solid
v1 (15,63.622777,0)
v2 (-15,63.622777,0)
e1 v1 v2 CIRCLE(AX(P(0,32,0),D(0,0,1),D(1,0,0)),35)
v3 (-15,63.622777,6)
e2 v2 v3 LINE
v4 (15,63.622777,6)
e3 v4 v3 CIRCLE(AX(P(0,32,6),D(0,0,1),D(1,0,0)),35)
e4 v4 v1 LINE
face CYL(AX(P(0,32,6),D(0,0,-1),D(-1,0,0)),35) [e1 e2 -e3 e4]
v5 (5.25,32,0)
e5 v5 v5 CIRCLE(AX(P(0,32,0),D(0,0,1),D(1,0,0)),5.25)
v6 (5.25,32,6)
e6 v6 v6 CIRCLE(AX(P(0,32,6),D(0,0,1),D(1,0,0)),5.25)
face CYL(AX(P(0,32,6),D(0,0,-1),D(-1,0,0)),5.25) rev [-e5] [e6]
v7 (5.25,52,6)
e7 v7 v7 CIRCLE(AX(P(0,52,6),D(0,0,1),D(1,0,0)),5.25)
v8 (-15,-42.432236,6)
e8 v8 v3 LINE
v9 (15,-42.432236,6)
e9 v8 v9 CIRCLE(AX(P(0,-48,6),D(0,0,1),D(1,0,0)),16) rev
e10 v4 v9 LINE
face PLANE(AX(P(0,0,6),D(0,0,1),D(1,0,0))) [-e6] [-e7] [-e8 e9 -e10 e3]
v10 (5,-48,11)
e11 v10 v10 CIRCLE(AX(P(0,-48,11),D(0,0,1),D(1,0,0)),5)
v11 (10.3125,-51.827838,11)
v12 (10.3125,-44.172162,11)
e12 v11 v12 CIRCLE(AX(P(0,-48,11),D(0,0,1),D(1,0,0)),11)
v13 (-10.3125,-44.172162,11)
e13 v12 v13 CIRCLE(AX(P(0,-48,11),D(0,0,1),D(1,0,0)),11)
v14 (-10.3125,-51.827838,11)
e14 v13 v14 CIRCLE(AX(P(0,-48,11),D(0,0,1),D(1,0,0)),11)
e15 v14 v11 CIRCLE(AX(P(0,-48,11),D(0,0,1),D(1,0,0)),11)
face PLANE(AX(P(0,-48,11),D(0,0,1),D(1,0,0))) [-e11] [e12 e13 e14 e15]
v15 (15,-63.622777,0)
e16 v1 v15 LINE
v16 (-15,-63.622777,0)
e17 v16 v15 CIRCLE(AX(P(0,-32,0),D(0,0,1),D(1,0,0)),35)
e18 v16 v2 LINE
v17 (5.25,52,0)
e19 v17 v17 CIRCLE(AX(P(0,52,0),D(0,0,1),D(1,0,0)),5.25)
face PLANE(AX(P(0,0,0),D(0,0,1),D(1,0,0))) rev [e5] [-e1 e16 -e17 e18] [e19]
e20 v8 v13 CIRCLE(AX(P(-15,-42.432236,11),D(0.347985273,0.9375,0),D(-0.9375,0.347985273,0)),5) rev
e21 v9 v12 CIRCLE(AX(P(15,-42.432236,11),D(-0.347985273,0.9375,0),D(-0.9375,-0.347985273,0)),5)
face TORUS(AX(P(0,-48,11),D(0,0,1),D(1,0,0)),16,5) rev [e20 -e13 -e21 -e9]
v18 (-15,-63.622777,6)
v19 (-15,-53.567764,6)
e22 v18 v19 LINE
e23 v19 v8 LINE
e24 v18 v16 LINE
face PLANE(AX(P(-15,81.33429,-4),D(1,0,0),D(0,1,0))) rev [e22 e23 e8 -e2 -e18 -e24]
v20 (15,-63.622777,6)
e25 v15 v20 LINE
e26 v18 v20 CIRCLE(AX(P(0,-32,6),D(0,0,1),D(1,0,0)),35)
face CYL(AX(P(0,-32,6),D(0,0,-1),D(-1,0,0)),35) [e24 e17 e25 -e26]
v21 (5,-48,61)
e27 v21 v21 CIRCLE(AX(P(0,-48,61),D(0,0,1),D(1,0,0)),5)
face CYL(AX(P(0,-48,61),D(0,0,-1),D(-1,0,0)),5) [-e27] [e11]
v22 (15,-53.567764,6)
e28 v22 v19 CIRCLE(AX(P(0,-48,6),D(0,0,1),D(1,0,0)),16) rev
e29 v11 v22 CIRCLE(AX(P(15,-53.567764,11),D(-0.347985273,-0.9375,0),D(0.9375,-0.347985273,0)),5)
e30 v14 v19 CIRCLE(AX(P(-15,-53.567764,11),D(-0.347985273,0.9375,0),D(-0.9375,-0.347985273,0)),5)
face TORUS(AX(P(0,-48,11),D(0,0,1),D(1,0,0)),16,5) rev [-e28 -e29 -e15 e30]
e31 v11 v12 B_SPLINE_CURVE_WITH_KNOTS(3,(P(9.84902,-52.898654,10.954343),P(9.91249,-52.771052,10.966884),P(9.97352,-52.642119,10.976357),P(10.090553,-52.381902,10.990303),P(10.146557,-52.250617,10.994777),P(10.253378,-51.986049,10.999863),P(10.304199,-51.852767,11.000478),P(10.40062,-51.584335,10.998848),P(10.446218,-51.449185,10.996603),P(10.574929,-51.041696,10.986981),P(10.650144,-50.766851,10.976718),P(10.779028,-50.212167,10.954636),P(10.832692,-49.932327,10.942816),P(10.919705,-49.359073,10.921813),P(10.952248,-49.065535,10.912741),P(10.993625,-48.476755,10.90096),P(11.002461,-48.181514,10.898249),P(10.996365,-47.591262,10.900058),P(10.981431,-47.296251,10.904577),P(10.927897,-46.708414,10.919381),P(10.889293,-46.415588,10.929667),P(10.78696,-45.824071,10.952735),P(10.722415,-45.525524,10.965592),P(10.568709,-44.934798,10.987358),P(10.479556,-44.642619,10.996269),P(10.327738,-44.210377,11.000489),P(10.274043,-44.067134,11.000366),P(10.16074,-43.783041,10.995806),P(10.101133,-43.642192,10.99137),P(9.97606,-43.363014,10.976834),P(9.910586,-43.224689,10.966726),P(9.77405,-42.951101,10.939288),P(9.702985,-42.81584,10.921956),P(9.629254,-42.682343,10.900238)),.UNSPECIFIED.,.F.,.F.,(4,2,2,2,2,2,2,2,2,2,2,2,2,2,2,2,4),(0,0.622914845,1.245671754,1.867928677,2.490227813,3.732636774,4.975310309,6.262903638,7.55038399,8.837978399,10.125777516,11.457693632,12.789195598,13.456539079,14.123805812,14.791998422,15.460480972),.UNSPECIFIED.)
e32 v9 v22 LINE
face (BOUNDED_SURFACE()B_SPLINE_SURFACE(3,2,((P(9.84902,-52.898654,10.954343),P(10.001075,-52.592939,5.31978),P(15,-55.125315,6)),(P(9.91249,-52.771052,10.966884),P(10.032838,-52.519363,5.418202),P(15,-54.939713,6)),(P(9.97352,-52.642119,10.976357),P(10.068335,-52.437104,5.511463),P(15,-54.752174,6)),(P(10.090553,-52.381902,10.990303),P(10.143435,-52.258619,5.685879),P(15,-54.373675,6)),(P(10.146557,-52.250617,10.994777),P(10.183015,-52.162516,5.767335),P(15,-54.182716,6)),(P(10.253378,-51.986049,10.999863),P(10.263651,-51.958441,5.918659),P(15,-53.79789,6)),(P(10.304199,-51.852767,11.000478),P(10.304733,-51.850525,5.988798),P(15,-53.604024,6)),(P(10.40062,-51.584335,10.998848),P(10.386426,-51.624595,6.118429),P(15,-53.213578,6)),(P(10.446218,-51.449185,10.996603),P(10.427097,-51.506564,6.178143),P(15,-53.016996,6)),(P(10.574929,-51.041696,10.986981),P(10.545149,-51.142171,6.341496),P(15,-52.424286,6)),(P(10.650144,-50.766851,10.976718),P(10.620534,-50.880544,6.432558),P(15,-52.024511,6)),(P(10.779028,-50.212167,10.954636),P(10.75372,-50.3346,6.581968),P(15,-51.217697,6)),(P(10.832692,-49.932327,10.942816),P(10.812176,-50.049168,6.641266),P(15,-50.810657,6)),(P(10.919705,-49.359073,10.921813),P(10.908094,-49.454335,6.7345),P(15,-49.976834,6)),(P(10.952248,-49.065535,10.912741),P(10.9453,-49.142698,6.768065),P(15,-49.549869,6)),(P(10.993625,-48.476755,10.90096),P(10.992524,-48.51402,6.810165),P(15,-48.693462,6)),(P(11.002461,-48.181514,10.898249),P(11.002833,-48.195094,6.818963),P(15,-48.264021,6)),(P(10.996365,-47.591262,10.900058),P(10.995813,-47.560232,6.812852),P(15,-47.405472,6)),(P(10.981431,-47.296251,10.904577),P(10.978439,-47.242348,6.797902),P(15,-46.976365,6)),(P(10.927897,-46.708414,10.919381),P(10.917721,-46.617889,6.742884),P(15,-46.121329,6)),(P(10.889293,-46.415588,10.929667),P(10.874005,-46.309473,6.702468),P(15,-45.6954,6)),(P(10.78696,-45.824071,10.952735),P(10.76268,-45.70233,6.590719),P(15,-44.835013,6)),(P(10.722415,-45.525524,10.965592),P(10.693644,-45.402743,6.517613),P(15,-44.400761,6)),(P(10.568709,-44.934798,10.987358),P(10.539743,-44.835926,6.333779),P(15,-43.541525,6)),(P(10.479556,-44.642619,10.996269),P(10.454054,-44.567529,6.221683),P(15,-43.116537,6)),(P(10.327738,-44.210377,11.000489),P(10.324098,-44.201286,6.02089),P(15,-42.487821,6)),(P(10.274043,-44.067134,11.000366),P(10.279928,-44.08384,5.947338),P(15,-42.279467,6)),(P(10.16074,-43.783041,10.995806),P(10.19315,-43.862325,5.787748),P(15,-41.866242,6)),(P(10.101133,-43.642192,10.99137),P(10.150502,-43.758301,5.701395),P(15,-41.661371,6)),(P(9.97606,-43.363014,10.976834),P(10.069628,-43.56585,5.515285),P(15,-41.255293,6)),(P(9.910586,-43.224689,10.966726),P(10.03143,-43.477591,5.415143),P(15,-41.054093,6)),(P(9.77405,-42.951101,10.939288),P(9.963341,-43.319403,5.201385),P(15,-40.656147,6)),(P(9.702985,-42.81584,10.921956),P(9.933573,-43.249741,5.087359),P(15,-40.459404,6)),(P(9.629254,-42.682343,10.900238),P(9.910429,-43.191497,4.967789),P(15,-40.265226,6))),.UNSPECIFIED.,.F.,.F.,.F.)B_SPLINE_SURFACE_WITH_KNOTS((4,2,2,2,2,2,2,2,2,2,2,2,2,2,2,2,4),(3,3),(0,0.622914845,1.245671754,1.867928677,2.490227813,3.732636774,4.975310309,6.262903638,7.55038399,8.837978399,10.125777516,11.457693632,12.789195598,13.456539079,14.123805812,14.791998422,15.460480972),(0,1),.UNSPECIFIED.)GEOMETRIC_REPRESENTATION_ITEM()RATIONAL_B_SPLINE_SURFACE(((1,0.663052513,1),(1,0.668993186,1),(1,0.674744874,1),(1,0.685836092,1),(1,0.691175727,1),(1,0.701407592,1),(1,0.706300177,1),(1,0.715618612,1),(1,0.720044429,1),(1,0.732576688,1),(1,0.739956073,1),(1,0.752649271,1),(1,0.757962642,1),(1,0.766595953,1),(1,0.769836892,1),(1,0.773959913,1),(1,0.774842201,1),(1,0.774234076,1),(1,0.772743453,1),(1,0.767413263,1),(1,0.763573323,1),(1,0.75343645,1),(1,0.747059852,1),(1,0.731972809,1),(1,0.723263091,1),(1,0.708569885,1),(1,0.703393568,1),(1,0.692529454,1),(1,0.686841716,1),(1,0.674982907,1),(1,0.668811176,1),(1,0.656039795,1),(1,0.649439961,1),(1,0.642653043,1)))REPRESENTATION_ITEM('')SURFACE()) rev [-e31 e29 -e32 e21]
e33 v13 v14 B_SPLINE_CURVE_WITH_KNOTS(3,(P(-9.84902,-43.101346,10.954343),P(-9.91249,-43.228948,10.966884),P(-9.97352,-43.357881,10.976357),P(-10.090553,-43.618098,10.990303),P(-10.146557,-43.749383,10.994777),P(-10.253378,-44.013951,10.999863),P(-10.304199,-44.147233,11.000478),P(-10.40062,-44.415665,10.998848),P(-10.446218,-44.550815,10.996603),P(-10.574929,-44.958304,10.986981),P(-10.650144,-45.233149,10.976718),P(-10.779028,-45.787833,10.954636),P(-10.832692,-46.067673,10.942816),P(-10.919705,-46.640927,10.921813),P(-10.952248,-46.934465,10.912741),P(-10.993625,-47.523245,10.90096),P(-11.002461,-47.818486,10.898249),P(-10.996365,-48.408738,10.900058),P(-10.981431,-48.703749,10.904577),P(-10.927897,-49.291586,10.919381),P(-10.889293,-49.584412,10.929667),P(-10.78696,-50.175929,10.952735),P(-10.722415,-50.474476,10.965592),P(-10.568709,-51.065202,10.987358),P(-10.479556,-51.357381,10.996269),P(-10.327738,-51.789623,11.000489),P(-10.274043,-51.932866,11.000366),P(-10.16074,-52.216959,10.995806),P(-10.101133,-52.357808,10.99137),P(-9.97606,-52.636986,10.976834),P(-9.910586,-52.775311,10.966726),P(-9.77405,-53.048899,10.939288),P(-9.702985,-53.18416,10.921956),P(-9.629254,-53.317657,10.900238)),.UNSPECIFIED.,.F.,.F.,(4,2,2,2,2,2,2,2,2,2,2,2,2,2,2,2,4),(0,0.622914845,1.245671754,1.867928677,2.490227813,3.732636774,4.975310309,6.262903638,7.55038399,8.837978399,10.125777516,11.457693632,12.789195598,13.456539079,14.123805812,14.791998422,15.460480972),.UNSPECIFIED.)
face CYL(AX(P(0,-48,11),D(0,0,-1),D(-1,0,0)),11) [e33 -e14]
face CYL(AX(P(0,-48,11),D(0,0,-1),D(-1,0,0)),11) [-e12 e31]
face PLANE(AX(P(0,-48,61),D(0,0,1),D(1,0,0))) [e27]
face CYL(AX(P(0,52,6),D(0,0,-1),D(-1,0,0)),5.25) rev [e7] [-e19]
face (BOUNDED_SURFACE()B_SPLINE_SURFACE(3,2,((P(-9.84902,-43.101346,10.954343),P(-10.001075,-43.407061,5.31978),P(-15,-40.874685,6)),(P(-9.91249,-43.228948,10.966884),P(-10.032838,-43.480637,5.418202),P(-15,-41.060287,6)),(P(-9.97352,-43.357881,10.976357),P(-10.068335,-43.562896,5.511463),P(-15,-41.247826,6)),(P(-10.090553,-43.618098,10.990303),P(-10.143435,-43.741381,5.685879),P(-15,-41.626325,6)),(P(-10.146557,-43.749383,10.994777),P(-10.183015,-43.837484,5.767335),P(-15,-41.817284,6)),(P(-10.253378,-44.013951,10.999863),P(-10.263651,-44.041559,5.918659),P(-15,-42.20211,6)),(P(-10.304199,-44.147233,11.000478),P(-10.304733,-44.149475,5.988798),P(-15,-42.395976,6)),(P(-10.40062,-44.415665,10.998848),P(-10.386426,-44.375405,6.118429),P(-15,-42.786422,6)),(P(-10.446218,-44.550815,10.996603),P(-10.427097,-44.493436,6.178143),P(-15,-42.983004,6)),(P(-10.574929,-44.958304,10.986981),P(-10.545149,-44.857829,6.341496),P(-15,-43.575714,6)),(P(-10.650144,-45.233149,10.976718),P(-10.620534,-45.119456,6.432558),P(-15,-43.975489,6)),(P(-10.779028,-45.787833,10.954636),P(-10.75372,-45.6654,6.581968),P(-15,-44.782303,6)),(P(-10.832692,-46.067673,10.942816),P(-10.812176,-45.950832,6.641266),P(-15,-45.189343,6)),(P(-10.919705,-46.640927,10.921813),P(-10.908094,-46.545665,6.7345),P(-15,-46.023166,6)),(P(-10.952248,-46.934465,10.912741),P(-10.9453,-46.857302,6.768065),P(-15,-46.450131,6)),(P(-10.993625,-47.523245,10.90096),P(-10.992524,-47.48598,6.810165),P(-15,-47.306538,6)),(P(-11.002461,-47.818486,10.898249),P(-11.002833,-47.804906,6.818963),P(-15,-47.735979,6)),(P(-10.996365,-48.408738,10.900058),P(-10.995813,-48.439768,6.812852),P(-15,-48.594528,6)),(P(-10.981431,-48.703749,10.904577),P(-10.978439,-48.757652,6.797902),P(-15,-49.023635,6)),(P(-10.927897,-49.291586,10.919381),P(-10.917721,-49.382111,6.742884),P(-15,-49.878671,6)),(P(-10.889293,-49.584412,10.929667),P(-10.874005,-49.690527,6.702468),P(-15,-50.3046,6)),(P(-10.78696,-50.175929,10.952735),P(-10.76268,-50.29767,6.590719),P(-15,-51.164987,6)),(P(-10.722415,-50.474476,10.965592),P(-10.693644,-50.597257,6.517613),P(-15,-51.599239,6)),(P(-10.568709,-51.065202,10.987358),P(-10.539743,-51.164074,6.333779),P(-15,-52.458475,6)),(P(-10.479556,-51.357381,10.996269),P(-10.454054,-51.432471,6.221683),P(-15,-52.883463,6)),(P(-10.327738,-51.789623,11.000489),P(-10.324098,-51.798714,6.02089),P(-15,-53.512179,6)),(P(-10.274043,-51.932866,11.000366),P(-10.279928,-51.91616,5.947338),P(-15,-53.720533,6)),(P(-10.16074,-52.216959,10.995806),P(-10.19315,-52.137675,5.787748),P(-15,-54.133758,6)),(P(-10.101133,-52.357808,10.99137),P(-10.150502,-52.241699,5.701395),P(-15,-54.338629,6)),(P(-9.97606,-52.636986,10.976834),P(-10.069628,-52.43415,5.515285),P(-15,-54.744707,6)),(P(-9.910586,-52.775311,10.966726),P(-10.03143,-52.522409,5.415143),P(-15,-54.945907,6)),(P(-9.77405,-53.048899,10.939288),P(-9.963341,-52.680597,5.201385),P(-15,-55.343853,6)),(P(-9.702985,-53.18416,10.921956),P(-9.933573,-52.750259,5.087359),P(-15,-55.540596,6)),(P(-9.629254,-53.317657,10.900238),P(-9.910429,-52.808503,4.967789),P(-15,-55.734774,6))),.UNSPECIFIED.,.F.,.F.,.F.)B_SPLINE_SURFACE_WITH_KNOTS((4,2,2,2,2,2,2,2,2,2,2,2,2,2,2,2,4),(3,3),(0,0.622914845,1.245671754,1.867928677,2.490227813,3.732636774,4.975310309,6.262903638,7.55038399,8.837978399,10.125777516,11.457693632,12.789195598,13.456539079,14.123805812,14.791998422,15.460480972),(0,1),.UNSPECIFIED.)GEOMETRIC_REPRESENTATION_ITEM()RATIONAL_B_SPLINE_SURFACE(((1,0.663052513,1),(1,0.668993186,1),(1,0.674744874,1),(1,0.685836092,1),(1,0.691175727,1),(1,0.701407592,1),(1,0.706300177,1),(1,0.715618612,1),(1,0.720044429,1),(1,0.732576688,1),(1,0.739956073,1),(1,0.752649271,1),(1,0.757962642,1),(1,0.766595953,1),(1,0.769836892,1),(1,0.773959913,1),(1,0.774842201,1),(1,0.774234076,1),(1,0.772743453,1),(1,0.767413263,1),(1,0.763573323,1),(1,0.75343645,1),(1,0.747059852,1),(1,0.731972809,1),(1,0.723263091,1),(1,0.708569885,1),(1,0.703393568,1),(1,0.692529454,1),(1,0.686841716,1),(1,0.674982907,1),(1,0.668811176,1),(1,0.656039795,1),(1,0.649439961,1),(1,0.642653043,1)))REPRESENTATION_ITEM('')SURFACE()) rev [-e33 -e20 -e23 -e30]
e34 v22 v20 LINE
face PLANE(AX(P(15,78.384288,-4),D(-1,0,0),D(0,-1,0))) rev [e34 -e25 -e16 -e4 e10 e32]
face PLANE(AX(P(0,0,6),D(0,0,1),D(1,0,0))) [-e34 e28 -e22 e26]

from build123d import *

# Parameters (mm, degrees)
SKICA1_R                 = 5.25
P_IDAT_VYSUNUT_M1_DEPTH  = 6
SKICA2_R                 = 11
P_IDAT_VYSUNUT_M2_DEPTH  = 5
SKICA3_W                 = 36.875028654
SKICA3_H                 = 156.768575318
SKICA3_W_2               = 39.825030946
SKICA3_H_2               = 162.668579902
ODEBRAT_VYSUNUT_M1_DEPTH = 10
ZAOBLIT1_R               = 5
SKICA4_R                 = 5
P_IDAT_VYSUNUT_M3_DEPTH  = 50


with BuildPart() as part:
    # Skica1 → Přidat vysunutím1 (new body)
    with BuildSketch(Plane.XY):
        with BuildLine():
            Line((-17.5, -62.310889132), (-17.5, 62.310889132))
            ThreePointArc((-17.5, 62.310889132), (0, 67), (17.5, 62.310889132))
            Line((17.5, 62.310889132), (17.5, -62.310889132))
            ThreePointArc((17.5, -62.310889132), (0, -67), (-17.5, -62.310889132))
        make_face()
        with Locations((0, 52)):
            Circle(SKICA1_R, mode=Mode.SUBTRACT)
        with Locations((0, 32)):
            Circle(SKICA1_R, mode=Mode.SUBTRACT)
    extrude(amount=P_IDAT_VYSUNUT_M1_DEPTH)

    # Skica2 → Přidat vysunutím2 (add)
    with BuildSketch(Plane.XY.offset(6)):
        with Locations((0, -48)):
            Circle(SKICA2_R)
    extrude(amount=P_IDAT_VYSUNUT_M2_DEPTH)

    # Skica3 → Odebrat vysunutím1 (cut)
    with BuildSketch(Plane.XY.offset(6)):
        with Locations((33.437514327, 0)):
            Rectangle(SKICA3_W, SKICA3_H)
        with Locations((-34.912515473, 0)):
            Rectangle(SKICA3_W_2, SKICA3_H_2)
    extrude(amount=-ODEBRAT_VYSUNUT_M1_DEPTH, mode=Mode.SUBTRACT)

    # Zaoblit1
    zaoblit1_edges = [part.edges().sort_by_distance(p)[0] for p in [
        (-11, -48, 6),
    ]]
    fillet(zaoblit1_edges, radius=ZAOBLIT1_R - 0.0001)  # a hair under: the kernel refuses the full size

    # Skica4 → Přidat vysunutím3 (add)
    with BuildSketch(Plane.XY.offset(11)):
        with Locations((0, -48)):
            Circle(SKICA4_R)
    extrude(amount=P_IDAT_VYSUNUT_M3_DEPTH)


solid = part.part
